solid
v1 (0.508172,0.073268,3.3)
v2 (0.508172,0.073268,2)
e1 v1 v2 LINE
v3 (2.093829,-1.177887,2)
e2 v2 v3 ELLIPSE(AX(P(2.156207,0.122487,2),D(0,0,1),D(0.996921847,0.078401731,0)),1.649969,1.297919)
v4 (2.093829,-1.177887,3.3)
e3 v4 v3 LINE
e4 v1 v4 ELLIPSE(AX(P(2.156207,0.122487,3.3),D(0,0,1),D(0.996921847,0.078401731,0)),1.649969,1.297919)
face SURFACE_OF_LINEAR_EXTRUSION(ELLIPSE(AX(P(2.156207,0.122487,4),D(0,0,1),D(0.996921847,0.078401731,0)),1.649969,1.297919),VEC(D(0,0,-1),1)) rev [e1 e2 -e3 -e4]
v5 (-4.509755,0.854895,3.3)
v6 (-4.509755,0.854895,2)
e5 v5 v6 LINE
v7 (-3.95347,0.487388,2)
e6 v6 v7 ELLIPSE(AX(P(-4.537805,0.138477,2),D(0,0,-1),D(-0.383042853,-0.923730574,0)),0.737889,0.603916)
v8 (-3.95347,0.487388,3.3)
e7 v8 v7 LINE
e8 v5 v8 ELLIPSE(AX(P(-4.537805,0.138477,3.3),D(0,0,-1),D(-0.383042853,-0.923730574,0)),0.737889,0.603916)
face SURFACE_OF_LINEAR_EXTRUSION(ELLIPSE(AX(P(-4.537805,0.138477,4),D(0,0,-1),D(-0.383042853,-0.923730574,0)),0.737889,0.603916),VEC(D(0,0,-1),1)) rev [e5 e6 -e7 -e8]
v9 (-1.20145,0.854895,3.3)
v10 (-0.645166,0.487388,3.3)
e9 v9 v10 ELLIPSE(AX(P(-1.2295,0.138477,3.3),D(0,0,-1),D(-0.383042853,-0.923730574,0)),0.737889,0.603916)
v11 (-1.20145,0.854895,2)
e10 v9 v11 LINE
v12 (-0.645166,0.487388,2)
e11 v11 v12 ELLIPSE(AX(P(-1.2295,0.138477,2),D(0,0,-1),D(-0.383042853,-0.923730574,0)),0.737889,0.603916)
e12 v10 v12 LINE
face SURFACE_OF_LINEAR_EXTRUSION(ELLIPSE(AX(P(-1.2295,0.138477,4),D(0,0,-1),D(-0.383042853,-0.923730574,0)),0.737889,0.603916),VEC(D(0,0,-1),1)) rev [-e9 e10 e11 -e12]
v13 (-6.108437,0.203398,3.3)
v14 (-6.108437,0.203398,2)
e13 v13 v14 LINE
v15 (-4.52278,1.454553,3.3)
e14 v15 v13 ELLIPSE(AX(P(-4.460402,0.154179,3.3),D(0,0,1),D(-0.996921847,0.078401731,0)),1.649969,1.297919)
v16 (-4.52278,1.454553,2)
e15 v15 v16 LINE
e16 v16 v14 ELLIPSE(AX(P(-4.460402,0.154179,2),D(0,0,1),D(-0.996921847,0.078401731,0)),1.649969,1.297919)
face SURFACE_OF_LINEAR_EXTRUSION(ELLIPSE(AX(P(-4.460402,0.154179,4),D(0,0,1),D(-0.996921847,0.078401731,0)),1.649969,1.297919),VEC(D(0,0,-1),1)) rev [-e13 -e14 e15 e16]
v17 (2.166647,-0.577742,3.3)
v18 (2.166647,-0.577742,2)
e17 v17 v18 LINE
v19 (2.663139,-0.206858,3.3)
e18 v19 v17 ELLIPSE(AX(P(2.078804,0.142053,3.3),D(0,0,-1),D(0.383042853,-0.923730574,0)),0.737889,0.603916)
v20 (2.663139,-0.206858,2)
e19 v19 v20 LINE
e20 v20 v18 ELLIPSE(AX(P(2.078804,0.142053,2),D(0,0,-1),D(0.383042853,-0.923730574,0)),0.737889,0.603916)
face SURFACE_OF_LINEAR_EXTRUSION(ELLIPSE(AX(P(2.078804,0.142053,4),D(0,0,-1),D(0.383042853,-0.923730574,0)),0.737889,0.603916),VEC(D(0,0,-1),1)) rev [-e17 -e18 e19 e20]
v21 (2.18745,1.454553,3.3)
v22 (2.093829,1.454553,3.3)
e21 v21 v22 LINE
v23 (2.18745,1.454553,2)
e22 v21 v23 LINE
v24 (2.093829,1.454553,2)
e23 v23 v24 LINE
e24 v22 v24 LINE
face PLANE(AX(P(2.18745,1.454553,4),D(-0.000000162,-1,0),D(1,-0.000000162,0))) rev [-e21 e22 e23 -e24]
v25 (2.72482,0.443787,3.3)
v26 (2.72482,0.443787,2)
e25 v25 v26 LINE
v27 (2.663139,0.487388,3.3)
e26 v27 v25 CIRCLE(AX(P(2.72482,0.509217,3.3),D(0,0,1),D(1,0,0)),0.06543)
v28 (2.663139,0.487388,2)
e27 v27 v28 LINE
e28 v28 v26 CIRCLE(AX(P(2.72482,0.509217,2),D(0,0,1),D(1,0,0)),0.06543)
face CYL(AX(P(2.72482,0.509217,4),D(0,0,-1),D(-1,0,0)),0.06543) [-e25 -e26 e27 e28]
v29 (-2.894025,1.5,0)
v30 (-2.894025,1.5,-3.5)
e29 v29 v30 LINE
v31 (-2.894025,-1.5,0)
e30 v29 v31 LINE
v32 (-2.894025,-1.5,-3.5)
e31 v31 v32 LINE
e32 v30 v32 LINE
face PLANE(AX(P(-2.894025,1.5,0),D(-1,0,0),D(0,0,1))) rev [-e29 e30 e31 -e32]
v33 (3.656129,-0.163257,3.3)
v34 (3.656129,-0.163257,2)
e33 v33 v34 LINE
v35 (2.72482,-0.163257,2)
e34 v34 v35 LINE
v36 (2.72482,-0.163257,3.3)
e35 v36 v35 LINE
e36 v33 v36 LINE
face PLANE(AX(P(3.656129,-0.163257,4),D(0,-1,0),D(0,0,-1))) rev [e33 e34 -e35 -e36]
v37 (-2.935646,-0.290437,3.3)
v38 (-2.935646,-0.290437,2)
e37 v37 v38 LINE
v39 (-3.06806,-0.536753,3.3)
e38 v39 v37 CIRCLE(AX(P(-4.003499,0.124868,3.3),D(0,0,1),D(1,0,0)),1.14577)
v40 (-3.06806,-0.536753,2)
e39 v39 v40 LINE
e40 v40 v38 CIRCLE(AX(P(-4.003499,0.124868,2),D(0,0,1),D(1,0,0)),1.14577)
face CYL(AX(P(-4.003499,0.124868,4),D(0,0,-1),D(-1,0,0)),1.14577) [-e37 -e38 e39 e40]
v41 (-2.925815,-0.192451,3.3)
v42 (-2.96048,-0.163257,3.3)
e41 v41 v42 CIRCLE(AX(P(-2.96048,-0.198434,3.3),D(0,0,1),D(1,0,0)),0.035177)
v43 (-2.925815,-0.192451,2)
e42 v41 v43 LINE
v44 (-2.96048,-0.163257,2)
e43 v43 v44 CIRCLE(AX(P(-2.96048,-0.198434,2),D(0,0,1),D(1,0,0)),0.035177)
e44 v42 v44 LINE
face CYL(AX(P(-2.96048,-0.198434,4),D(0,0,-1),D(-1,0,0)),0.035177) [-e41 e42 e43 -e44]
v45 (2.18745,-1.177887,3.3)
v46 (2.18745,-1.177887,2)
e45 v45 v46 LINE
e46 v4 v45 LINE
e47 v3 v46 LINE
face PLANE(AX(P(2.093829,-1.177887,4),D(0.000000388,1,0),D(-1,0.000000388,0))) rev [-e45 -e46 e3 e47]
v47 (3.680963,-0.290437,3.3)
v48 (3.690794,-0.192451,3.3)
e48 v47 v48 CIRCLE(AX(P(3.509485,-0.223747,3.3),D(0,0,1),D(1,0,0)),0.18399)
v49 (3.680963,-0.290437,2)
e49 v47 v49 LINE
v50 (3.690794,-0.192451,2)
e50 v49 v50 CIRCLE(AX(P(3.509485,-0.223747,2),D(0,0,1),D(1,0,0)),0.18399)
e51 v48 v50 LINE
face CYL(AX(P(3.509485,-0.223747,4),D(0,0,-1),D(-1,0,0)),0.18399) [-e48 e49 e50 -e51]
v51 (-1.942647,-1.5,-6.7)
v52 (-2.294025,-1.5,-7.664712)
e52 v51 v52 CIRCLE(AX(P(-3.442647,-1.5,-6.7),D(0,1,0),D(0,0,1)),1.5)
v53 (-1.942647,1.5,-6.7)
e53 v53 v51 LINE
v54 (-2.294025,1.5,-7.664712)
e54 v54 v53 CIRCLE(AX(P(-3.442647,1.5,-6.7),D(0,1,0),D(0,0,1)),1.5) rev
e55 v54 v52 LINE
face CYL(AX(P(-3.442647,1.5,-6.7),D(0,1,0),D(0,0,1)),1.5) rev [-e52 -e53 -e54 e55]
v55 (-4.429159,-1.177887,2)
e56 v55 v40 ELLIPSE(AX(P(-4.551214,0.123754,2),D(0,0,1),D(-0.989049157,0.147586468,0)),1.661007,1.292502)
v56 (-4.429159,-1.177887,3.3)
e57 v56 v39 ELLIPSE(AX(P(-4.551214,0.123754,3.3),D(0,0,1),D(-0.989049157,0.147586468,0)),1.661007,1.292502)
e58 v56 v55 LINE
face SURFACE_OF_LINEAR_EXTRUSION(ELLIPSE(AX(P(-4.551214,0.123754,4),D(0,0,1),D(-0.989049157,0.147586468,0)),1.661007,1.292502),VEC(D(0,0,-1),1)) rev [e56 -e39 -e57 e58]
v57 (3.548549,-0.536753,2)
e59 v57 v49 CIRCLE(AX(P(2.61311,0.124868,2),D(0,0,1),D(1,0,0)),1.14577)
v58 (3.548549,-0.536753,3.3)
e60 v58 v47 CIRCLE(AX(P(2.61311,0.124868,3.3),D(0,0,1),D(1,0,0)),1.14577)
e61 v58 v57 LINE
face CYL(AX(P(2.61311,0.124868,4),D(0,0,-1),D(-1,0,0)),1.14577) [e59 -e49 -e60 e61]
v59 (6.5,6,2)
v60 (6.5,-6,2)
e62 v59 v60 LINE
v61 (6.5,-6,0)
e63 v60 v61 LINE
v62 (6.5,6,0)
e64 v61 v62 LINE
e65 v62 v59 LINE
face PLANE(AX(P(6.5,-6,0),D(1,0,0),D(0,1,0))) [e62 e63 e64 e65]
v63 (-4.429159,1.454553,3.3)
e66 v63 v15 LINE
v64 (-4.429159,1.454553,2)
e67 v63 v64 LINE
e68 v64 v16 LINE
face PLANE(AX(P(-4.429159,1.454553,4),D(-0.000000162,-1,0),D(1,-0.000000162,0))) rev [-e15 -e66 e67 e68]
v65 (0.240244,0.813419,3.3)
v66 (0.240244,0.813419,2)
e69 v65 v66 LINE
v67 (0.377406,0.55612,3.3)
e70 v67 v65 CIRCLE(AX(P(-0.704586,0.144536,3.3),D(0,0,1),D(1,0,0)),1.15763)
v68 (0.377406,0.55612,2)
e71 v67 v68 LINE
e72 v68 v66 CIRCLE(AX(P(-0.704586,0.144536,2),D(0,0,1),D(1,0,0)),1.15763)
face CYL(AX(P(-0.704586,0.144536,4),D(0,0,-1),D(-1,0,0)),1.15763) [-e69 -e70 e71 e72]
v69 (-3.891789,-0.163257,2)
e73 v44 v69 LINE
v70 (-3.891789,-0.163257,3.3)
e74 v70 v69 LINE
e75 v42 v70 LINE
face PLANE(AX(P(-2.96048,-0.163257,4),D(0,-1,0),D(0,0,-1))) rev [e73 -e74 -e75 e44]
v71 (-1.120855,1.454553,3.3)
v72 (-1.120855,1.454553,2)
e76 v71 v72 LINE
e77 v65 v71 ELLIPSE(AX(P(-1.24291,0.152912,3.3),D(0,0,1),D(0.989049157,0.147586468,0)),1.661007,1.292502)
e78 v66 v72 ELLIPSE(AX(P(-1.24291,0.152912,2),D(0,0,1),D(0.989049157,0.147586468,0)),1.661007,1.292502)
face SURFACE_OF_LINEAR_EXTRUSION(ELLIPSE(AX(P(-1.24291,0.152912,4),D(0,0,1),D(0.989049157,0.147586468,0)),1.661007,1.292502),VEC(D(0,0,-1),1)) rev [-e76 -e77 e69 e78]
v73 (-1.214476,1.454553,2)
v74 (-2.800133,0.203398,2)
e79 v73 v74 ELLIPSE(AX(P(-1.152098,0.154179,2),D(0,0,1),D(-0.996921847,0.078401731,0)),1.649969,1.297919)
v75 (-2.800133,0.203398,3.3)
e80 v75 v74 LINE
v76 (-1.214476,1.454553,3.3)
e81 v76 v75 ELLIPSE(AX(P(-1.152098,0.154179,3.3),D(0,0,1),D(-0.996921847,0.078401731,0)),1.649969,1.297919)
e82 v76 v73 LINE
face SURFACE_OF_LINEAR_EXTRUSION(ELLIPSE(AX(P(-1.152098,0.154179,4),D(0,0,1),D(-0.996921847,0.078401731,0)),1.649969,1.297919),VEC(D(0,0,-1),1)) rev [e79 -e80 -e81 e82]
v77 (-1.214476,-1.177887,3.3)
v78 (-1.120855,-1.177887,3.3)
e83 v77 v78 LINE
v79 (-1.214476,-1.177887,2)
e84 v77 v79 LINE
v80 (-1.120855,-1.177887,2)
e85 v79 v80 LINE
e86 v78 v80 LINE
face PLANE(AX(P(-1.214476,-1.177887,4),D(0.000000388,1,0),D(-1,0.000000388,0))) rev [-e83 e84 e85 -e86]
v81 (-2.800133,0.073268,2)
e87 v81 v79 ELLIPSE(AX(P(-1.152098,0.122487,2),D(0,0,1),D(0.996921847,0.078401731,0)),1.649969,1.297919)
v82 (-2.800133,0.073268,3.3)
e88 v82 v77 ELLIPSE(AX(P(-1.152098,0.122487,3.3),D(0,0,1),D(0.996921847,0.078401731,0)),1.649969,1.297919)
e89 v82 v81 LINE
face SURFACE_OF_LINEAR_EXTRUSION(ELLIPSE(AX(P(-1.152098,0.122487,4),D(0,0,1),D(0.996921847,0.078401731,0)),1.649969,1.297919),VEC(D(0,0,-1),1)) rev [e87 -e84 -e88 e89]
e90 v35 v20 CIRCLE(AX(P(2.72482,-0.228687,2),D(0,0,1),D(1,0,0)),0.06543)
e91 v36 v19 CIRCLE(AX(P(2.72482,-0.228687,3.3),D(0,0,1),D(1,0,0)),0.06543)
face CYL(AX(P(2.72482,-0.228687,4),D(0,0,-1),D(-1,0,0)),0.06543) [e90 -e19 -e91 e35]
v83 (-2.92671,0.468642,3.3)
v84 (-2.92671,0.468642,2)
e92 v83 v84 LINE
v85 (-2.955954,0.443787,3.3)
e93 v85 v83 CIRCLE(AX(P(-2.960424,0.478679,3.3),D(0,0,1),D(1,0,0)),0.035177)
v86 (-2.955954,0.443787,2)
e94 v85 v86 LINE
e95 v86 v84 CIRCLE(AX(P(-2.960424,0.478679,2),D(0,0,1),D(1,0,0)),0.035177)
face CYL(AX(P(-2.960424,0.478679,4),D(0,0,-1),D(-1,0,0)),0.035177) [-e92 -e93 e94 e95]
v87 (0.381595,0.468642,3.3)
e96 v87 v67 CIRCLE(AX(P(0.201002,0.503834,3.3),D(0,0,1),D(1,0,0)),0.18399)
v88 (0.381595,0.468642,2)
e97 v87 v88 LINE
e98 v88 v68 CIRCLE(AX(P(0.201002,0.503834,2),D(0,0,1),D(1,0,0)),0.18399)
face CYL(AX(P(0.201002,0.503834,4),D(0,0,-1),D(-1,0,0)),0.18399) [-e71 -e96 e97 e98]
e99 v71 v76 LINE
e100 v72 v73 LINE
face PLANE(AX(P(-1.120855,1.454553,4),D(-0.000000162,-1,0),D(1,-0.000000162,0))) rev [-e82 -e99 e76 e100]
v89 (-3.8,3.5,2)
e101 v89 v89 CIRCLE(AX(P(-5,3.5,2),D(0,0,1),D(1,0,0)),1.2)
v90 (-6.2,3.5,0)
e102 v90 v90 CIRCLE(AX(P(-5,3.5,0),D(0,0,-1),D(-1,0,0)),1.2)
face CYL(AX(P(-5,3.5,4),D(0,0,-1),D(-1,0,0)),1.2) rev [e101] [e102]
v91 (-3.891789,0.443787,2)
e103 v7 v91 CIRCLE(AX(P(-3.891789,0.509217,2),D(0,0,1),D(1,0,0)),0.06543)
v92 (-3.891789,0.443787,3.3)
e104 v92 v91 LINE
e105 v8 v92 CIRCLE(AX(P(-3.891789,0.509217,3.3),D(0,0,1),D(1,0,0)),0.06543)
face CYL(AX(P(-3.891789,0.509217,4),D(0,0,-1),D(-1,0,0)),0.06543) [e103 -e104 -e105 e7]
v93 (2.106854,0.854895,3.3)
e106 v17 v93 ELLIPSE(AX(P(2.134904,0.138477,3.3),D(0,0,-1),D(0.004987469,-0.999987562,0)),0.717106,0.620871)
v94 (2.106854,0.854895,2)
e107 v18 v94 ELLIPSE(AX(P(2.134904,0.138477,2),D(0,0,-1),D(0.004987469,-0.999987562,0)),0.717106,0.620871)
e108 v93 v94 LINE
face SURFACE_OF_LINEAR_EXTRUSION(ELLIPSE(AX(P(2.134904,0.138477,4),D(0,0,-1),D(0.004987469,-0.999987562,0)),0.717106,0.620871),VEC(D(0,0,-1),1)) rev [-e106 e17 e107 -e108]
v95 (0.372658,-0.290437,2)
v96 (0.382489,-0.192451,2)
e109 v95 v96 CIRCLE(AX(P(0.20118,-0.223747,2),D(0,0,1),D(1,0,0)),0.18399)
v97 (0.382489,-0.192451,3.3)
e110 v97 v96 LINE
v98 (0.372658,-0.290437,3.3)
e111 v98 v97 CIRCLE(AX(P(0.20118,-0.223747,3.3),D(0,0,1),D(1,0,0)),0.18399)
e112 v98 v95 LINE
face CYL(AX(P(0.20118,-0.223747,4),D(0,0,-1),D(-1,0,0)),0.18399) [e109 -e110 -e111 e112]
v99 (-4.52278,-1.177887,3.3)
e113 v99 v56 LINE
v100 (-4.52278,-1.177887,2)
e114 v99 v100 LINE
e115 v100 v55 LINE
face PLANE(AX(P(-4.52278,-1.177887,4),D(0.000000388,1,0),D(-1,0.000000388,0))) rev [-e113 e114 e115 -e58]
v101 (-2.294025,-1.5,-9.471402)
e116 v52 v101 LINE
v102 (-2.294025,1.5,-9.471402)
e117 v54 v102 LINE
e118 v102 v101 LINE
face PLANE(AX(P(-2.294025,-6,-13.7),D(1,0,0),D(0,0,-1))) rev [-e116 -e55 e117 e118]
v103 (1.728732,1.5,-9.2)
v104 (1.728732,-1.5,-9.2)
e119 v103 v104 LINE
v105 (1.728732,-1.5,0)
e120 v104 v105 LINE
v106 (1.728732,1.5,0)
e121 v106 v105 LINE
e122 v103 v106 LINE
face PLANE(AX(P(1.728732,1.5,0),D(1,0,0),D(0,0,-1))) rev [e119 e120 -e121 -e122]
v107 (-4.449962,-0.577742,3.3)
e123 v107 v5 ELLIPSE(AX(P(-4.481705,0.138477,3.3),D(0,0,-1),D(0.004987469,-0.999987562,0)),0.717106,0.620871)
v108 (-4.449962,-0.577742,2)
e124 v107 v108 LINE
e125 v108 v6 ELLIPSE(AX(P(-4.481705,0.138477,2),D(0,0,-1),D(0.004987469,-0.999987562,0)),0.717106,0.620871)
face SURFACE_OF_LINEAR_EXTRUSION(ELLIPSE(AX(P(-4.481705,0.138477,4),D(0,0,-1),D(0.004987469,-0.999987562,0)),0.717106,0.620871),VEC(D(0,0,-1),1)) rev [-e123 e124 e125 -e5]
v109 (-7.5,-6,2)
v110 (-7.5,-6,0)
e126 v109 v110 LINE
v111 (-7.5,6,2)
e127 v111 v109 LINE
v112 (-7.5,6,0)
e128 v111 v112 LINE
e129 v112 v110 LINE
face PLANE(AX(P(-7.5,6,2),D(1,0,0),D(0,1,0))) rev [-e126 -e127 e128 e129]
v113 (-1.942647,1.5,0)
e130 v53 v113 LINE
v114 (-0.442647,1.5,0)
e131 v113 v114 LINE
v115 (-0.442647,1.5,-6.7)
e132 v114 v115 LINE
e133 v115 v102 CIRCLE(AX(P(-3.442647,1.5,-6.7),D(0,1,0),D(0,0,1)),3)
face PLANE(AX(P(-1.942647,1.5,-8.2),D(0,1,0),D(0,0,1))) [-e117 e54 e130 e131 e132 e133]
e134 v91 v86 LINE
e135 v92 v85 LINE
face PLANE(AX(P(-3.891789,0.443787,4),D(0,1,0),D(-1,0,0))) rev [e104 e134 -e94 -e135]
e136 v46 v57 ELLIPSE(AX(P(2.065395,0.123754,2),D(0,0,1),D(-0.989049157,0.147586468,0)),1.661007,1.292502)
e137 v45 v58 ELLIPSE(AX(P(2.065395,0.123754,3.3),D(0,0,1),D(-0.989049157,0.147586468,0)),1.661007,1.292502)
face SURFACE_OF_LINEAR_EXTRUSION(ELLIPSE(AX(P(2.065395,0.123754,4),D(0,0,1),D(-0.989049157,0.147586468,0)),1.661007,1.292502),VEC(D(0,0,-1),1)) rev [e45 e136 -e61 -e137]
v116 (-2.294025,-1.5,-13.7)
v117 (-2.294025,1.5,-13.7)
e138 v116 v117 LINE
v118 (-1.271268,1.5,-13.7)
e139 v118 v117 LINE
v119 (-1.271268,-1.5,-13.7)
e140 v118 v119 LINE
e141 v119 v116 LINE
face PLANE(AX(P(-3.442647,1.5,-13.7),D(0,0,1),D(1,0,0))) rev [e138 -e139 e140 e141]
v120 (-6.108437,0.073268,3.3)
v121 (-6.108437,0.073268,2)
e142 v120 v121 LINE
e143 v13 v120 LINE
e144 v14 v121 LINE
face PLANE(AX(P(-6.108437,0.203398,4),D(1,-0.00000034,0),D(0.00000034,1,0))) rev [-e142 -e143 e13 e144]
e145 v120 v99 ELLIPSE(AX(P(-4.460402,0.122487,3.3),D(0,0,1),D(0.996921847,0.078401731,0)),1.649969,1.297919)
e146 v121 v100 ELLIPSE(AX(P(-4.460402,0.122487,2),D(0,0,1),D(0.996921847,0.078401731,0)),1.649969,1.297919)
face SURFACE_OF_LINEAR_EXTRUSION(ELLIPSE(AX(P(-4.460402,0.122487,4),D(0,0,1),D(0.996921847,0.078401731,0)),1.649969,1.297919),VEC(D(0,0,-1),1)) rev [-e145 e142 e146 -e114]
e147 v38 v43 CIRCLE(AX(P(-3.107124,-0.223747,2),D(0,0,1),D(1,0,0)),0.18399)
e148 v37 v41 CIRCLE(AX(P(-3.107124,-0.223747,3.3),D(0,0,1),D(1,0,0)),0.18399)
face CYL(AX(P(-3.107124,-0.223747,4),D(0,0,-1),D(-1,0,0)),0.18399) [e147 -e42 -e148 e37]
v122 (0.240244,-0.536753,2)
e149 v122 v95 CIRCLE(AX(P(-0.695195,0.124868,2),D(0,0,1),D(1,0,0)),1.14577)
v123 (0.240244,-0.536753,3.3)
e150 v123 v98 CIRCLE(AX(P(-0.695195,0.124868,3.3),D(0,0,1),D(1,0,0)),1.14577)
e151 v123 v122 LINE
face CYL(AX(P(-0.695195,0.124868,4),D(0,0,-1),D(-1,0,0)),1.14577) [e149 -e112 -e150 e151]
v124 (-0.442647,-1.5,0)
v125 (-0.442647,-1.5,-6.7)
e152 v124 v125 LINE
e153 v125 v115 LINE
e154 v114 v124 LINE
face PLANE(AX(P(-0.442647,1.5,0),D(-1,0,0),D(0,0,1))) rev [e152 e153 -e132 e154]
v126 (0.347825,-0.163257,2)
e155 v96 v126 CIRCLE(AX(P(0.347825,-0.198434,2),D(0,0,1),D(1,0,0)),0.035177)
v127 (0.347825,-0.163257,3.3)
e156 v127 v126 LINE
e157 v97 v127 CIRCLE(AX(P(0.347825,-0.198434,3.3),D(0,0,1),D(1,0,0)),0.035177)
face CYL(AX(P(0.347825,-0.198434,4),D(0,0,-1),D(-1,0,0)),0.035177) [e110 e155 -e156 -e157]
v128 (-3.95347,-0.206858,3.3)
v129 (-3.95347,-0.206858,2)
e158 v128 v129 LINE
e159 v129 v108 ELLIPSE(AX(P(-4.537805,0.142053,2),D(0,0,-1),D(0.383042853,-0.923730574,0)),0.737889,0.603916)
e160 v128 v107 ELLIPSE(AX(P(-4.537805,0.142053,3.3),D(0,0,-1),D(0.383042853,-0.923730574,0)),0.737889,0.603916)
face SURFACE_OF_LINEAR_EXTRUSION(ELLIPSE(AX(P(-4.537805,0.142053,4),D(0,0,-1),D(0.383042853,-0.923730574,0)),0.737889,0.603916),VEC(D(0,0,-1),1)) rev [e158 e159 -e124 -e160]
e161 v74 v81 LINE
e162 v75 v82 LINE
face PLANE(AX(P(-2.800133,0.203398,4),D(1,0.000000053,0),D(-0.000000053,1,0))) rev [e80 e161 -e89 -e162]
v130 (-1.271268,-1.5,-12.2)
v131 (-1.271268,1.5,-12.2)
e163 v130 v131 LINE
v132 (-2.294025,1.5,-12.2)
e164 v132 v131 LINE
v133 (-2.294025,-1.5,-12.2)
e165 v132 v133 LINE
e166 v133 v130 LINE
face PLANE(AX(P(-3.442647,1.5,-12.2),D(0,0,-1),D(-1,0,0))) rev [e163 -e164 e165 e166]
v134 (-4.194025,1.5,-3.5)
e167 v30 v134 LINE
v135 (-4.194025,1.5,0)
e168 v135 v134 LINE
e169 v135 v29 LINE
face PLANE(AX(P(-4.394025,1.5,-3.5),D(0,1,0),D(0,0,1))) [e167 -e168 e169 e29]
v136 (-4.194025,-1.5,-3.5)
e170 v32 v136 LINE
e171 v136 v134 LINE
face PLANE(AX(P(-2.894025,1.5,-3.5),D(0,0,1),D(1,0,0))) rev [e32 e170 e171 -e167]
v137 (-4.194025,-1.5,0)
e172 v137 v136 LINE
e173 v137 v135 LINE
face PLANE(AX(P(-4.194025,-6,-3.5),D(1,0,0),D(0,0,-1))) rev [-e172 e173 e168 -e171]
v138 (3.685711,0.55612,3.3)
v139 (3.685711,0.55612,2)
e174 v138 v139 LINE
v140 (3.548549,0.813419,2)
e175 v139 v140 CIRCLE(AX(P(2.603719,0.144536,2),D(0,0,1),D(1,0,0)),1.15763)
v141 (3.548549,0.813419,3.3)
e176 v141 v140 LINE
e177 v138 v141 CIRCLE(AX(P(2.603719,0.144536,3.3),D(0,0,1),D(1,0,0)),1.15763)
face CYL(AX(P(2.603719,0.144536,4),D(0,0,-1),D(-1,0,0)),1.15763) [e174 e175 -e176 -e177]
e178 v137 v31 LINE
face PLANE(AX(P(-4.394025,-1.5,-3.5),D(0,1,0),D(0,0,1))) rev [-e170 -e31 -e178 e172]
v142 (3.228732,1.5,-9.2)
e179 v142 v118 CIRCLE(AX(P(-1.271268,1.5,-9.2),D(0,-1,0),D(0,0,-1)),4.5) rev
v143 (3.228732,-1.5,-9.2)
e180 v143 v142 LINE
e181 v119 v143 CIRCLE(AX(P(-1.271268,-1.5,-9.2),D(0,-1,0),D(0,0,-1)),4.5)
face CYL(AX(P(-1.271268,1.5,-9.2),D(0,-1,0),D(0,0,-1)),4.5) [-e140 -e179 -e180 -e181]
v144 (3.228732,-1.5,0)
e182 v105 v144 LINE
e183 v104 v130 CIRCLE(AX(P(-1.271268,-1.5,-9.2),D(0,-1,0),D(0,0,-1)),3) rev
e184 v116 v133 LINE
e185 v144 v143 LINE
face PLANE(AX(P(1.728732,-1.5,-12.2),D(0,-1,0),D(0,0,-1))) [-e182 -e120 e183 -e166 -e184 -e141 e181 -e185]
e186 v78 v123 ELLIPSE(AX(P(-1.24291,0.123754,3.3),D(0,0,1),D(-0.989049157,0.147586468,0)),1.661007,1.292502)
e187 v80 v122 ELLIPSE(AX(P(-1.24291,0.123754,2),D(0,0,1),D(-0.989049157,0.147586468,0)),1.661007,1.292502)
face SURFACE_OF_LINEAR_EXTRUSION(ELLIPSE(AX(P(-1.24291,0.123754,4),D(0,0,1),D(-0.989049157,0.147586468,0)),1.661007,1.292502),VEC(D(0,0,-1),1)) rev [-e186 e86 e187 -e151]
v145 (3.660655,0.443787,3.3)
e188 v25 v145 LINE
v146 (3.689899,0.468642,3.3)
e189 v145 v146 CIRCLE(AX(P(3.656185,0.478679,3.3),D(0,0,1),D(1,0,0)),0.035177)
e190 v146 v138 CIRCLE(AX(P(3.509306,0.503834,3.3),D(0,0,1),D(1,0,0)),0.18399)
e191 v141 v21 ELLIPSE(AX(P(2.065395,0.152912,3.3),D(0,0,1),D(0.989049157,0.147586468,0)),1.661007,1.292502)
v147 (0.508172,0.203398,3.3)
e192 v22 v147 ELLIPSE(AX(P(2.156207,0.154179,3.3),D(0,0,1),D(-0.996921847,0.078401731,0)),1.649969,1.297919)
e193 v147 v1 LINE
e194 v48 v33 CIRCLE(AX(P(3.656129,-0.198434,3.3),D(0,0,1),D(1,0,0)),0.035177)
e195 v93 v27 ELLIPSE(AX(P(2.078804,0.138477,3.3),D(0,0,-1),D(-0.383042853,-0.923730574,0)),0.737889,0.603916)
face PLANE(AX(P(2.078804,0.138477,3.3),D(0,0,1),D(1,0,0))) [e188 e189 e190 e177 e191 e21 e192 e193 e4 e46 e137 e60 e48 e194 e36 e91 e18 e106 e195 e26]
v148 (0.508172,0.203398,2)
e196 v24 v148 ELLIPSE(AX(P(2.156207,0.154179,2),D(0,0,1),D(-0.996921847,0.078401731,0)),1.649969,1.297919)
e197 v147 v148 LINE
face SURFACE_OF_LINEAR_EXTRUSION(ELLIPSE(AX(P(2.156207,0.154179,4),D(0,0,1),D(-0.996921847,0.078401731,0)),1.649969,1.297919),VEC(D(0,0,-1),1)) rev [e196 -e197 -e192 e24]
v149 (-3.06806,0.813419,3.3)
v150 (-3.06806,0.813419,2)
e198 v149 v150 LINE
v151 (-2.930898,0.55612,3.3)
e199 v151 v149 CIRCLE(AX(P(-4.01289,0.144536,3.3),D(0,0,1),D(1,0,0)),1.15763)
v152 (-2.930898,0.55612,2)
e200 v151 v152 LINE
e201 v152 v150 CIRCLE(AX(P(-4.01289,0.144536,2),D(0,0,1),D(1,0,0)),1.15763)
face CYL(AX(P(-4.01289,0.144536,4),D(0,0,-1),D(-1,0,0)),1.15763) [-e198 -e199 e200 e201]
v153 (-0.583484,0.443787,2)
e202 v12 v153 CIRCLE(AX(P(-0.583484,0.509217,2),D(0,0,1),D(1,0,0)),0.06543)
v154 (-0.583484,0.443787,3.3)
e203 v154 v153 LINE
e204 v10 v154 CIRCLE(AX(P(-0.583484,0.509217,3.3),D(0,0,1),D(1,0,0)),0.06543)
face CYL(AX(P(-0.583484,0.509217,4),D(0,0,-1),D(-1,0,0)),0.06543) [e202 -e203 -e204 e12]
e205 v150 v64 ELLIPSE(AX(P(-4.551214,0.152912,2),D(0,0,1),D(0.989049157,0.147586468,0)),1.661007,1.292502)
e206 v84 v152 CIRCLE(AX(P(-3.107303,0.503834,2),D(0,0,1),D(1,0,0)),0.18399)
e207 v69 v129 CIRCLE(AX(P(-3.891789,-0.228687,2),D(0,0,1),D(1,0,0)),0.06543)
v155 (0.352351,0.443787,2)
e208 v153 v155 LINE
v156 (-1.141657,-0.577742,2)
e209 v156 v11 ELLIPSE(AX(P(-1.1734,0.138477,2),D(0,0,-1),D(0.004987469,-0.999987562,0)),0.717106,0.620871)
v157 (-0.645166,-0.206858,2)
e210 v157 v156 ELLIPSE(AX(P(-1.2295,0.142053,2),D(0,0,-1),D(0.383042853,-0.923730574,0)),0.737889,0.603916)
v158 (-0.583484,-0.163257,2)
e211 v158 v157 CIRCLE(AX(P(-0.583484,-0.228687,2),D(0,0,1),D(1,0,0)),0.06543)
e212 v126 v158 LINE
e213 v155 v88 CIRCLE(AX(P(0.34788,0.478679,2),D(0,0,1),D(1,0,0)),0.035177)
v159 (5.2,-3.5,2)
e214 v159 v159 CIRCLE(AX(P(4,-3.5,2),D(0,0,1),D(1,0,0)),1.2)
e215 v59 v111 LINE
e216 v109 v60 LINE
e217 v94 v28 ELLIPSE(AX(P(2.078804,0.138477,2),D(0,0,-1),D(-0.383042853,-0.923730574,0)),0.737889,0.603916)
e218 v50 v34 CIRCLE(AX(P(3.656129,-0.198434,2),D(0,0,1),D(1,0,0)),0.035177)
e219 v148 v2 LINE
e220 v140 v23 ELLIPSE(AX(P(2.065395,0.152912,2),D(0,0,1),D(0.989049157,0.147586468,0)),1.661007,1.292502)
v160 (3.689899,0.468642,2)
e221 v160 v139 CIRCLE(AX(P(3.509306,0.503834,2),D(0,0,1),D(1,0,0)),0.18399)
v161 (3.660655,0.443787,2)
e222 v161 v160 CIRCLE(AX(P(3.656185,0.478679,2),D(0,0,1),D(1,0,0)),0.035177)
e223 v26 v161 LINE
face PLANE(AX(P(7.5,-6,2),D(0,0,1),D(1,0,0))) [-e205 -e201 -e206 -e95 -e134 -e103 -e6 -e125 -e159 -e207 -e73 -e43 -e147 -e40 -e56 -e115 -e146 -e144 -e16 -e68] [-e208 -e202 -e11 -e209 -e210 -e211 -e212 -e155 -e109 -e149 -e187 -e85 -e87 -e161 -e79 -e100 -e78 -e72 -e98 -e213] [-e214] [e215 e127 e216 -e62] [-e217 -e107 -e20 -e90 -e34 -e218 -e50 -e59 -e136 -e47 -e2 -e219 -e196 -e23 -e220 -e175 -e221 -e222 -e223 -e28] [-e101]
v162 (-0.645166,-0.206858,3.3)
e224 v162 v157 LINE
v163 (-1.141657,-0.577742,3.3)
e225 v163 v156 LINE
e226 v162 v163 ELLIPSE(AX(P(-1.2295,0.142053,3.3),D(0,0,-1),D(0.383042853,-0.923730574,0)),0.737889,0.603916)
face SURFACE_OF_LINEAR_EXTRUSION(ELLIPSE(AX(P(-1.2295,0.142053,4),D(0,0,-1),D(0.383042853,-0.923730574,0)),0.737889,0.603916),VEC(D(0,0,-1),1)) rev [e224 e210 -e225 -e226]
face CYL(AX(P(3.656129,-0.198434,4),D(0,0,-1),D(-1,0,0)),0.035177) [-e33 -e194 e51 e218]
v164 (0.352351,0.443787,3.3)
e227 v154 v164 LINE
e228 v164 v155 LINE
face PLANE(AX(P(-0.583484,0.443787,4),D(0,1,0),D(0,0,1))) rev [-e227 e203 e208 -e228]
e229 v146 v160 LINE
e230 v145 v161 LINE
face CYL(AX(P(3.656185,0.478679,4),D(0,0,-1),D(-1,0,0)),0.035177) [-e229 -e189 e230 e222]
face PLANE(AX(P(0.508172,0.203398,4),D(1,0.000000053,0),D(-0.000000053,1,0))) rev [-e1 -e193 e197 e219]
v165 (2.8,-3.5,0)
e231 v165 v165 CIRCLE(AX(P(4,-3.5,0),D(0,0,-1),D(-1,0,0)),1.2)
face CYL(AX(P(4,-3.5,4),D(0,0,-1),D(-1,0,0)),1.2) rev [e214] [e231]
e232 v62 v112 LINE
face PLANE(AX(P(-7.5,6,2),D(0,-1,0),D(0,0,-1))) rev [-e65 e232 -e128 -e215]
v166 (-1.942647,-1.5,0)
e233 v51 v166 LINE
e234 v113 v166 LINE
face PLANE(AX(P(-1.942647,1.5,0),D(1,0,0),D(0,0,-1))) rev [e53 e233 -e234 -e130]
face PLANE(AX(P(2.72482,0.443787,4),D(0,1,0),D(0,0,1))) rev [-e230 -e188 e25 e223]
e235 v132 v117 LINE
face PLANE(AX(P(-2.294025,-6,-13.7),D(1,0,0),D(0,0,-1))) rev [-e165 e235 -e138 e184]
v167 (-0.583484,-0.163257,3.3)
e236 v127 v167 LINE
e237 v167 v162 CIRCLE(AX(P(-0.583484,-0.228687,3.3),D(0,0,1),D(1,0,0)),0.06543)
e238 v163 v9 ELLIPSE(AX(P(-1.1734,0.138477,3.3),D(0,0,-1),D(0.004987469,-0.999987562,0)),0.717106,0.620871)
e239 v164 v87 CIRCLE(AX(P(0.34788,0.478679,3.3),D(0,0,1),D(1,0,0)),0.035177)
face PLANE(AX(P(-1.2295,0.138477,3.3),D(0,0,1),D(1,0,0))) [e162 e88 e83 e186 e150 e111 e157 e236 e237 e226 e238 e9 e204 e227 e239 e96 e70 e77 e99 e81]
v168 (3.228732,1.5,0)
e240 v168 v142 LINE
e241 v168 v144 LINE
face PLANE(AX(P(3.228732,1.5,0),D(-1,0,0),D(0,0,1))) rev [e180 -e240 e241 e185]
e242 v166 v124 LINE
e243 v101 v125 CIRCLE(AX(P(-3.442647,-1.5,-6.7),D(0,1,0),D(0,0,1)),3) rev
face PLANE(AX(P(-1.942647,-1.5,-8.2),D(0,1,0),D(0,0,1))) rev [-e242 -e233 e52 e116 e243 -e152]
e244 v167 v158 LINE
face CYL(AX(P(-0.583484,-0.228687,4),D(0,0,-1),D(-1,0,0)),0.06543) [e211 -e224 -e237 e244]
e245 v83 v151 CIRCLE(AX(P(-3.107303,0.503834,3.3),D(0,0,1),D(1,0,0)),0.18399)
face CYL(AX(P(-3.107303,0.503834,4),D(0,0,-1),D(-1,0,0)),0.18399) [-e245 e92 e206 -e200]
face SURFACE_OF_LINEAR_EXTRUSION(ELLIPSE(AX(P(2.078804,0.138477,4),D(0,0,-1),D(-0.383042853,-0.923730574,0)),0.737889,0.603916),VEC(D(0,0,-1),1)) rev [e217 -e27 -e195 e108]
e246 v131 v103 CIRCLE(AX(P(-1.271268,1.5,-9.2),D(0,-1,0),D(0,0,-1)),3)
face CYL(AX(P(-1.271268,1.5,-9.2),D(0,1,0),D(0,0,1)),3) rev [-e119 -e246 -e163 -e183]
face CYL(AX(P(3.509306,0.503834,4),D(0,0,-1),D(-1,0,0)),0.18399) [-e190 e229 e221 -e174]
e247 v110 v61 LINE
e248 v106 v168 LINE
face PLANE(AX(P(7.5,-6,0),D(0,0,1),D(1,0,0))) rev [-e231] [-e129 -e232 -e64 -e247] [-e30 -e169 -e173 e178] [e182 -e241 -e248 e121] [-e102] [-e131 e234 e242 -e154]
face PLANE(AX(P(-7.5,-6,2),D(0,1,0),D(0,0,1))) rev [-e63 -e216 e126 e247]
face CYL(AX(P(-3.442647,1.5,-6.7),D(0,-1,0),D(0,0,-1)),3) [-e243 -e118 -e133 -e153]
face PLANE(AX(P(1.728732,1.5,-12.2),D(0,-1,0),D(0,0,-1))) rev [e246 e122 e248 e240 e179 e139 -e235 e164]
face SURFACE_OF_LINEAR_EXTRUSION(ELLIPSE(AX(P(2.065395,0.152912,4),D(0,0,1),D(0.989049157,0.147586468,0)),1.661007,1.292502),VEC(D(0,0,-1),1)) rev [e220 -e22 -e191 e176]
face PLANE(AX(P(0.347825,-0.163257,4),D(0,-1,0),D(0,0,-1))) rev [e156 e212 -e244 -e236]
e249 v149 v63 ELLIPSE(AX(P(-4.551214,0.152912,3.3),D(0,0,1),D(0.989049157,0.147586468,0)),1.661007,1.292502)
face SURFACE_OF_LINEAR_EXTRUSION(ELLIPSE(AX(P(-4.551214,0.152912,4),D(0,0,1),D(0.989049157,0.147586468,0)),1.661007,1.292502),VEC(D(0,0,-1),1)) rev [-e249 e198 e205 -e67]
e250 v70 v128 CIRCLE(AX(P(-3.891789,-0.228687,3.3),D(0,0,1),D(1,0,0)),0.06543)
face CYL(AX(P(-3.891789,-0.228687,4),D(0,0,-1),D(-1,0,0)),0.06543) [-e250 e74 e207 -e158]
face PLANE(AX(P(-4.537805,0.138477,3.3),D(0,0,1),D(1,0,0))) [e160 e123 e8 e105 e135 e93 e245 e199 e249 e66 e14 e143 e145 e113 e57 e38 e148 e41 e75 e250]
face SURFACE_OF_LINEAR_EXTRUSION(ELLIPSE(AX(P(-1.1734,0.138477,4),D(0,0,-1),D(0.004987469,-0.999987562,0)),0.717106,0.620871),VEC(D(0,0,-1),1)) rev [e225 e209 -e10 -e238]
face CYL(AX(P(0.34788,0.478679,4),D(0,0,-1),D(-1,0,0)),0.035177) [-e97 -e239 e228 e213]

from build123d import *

# Parameters (mm, degrees)
SKETCH1_W           = 15
SKETCH1_H           = 12
BOSS_EXTRUDE1_DEPTH = 2
BOSS_EXTRUDE2_DEPTH = 2
SKETCH3_W           = 1.5
SKETCH3_H           = 3.5
BOSS_EXTRUDE3_DEPTH = 1.5
FILLET3_R           = 1.5
FILLET4_R           = 3
FILLET5_R           = 3
FILLET6_R           = 4.5
SKETCH4_W           = 2
SKETCH4_H           = 12
CUT_EXTRUDE1_DEPTH  = 1
SKETCH5_R           = 1.2
CUT_EXTRUDE2_DEPTH  = 17.731407672
CUT_EXTRUDE3_START  = -0.7
CUT_EXTRUDE3_DEPTH  = 0.7
SKETCH7_W           = 1.148621372
SKETCH7_H           = 6.2
CUT_EXTRUDE4_DEPTH  = 18.325992122
SKETCH8_W           = 0.2
SKETCH8_H           = 3.5
CUT_EXTRUDE5_DEPTH  = 18.325992122


with BuildPart() as part:
    # Sketch1 → Boss-Extrude1 (new body)
    with BuildSketch(Plane.XY):
        Rectangle(SKETCH1_W, SKETCH1_H)
    extrude(amount=BOSS_EXTRUDE1_DEPTH)

    # Sketch2 → Boss-Extrude2 (add)
    with BuildSketch(Plane.XY.offset(2)):
        with BuildLine():
            Line((-0.583484164, 0.443787032), (0.352350759, 0.443787032))
            ThreePointArc((0.352350759, 0.443787032), (0.370660979, 0.451874829), (0.381594807, 0.468641703))
            ThreePointArc((0.381594807, 0.468641703), (0.38478126, 0.512633483), (0.377406248, 0.556119567))
            ThreePointArc((0.377406248, 0.556119567), (0.316958398, 0.689104808), (0.240244136, 0.81341868))
            add(Edge.make_bspline(
                [(0.240244136, 0.81341868), (-0.178053426, 1.454553053), (-1.120854898, 1.454553053)],
                knots=[3.484341046, 3.484341046, 3.484341046, 4.522924348, 4.522924348, 4.522924348], degree=2, weights=[1, 0.868170926, 1]))
            Line((-1.120854898, 1.454553053), (-1.214475951, 1.454553068))
            add(Edge.make_bspline(
                [(-1.214475951, 1.454553068), (-2.800132813, 1.454553068), (-2.800132813, 0.203397992)],
                knots=[1.670440536, 1.670440536, 1.670440536, 3.203377674, 3.203377674, 3.203377674], degree=2, weights=[1, 0.720364542, 1]))
            Line((-2.800132813, 0.203397992), (-2.800132806, 0.073267738))
            add(Edge.make_bspline(
                [(-2.800132806, 0.073267738), (-2.800132806, -1.177887338), (-1.214475944, -1.177887338)],
                knots=[3.079807634, 3.079807634, 3.079807634, 4.612744771, 4.612744771, 4.612744771], degree=2, weights=[1, 0.720364542, 1]))
            Line((-1.214475944, -1.177887338), (-1.120854891, -1.177887375))
            add(Edge.make_bspline(
                [(-1.120854891, -1.177887375), (-0.178053419, -1.177887375), (0.240244143, -0.536753002)],
                knots=[1.760260959, 1.760260959, 1.760260959, 2.798844261, 2.798844261, 2.798844261], degree=2, weights=[1, 0.868170926, 1]))
            ThreePointArc((0.240244143, -0.536753002), (0.313994237, -0.417650167), (0.372658208, -0.290437354))
            ThreePointArc((0.372658208, -0.290437354), (0.384251196, -0.24211404), (0.382489087, -0.192450825))
            ThreePointArc((0.382489087, -0.192450825), (0.370484527, -0.171527836), (0.347824512, -0.163257123))
            Line((0.347824512, -0.163257123), (-0.58348421, -0.163257123))
            ThreePointArc((-0.58348421, -0.163257123), (-0.62125204, -0.175257922), (-0.645165579, -0.206858093))
            add(Edge.make_bspline(
                [(-1.141657158, -0.577741646), (-0.776549247, -0.578100851), (-0.645165579, -0.206858093)],
                knots=[5.955155363, 5.955155363, 5.955155363, 7.020735545, 7.020735545, 7.020735545], degree=2, weights=[1, 0.86139323, 1]))
            add(Edge.make_bspline(
                [(-1.201450314, 0.854894524), (-1.823540048, 0.823436889), (-1.793554178, 0.104979402), (-1.763568309, -0.613478086), (-1.141657158, -0.577741646)],
                knots=[0.039432941, 0.039432941, 0.039432941, 1.613207044, 1.613207044, 3.186981147, 3.186981147, 3.186981147], degree=2, weights=[1, 0.706053195, 1, 0.706053195, 1]))
            add(Edge.make_bspline(
                [(-0.645165584, 0.487388037), (-0.79140441, 0.900606071), (-1.201450314, 0.854894524)],
                knots=[2.404042441, 2.404042441, 2.404042441, 3.565685694, 3.565685694, 3.565685694], degree=2, weights=[1, 0.836012096, 1]))
            ThreePointArc((-0.645165584, 0.487388037), (-0.621252025, 0.455787841), (-0.583484164, 0.443787032))
        make_face()
        with BuildLine():
            Line((-3.89178871, 0.443787032), (-2.955953786, 0.443787032))
            ThreePointArc((-2.955953786, 0.443787032), (-2.937643536, 0.451874816), (-2.926709688, 0.468641703))
            ThreePointArc((-2.926709688, 0.468641703), (-2.923523234, 0.512633483), (-2.930898247, 0.556119567))
            ThreePointArc((-2.930898247, 0.556119567), (-2.991346096, 0.689104808), (-3.068060358, 0.81341868))
            add(Edge.make_bspline(
                [(-3.068060358, 0.81341868), (-3.48635792, 1.454553053), (-4.429159392, 1.454553053)],
                knots=[3.484341046, 3.484341046, 3.484341046, 4.522924348, 4.522924348, 4.522924348], degree=2, weights=[1, 0.868170926, 1]))
            Line((-4.429159392, 1.454553053), (-4.522780446, 1.454553068))
            add(Edge.make_bspline(
                [(-4.522780446, 1.454553068), (-6.108437307, 1.454553068), (-6.108437307, 0.203397992)],
                knots=[4.81203319, 4.81203319, 4.81203319, 6.344970327, 6.344970327, 6.344970327], degree=2, weights=[1, 0.720364542, 1]))
            Line((-6.108437307, 0.203397992), (-6.108437352, 0.073267738))
            add(Edge.make_bspline(
                [(-6.108437352, 0.073267738), (-6.108437352, -1.177887338), (-4.52278049, -1.177887338)],
                knots=[6.221400287, 6.221400287, 6.221400287, 7.754337425, 7.754337425, 7.754337425], degree=2, weights=[1, 0.720364542, 1]))
            Line((-4.52278049, -1.177887338), (-4.429159437, -1.177887375))
            add(Edge.make_bspline(
                [(-4.429159437, -1.177887375), (-3.486357965, -1.177887375), (-3.068060402, -0.536753002)],
                knots=[1.760260959, 1.760260959, 1.760260959, 2.798844261, 2.798844261, 2.798844261], degree=2, weights=[1, 0.868170926, 1]))
            ThreePointArc((-3.068060402, -0.536753002), (-2.994310308, -0.417650167), (-2.935646337, -0.290437354))
            ThreePointArc((-2.935646337, -0.290437354), (-2.92405335, -0.24211404), (-2.925815458, -0.192450825))
            ThreePointArc((-2.925815458, -0.192450825), (-2.937820019, -0.171527836), (-2.960480033, -0.163257123))
            Line((-2.960480033, -0.163257123), (-3.891788755, -0.163257123))
            ThreePointArc((-3.891788755, -0.163257123), (-3.929556585, -0.175257922), (-3.953470124, -0.206858093))
            add(Edge.make_bspline(
                [(-4.449961703, -0.577741646), (-4.084853792, -0.578100851), (-3.953470124, -0.206858093)],
                knots=[5.955155363, 5.955155363, 5.955155363, 7.020735545, 7.020735545, 7.020735545], degree=2, weights=[1, 0.86139323, 1]))
            add(Edge.make_bspline(
                [(-4.509754859, 0.854894524), (-5.131844593, 0.82343689), (-5.101858724, 0.104979402), (-5.071872854, -0.613478086), (-4.449961703, -0.577741646)],
                knots=[0.039432941, 0.039432941, 0.039432941, 1.613207044, 1.613207044, 3.186981147, 3.186981147, 3.186981147], degree=2, weights=[1, 0.706053195, 1, 0.706053195, 1]))
            add(Edge.make_bspline(
                [(-3.95347013, 0.487388037), (-4.099708956, 0.900606071), (-4.509754859, 0.854894524)],
                knots=[2.40404244, 2.40404244, 2.40404244, 3.565685694, 3.565685694, 3.565685694], degree=2, weights=[1, 0.836012096, 1]))
            ThreePointArc((-3.95347013, 0.487388037), (-3.92955657, 0.455787841), (-3.89178871, 0.443787032))
        make_face()
        with BuildLine():
            Line((2.724820382, 0.443787032), (3.660655305, 0.443787032))
            ThreePointArc((3.660655305, 0.443787032), (3.678965525, 0.451874829), (3.689899353, 0.468641703))
            ThreePointArc((3.689899353, 0.468641703), (3.693085806, 0.512633483), (3.685710794, 0.556119567))
            ThreePointArc((3.685710794, 0.556119567), (3.625262944, 0.689104808), (3.548548682, 0.81341868))
            add(Edge.make_bspline(
                [(3.548548682, 0.81341868), (3.13025112, 1.454553053), (2.187449648, 1.454553053)],
                knots=[0.342748392, 0.342748392, 0.342748392, 1.381331695, 1.381331695, 1.381331695], degree=2, weights=[1, 0.868170926, 1]))
            Line((2.187449648, 1.454553053), (2.093828595, 1.454553068))
            add(Edge.make_bspline(
                [(2.093828595, 1.454553068), (0.508171733, 1.454553068), (0.508171733, 0.203397992)],
                knots=[4.81203319, 4.81203319, 4.81203319, 6.344970327, 6.344970327, 6.344970327], degree=2, weights=[1, 0.720364542, 1]))
            Line((0.508171733, 0.203397992), (0.50817174, 0.073267738))
            add(Edge.make_bspline(
                [(0.50817174, 0.073267738), (0.50817174, -1.177887338), (2.093828602, -1.177887338)],
                knots=[3.079807634, 3.079807634, 3.079807634, 4.612744771, 4.612744771, 4.612744771], degree=2, weights=[1, 0.720364542, 1]))
            Line((2.093828602, -1.177887338), (2.187449655, -1.177887375))
            add(Edge.make_bspline(
                [(2.187449655, -1.177887375), (3.130251127, -1.177887375), (3.548548689, -0.536753002)],
                knots=[1.760260959, 1.760260959, 1.760260959, 2.798844261, 2.798844261, 2.798844261], degree=2, weights=[1, 0.868170926, 1]))
            ThreePointArc((3.548548689, -0.536753002), (3.622298783, -0.417650167), (3.680962754, -0.290437354))
            ThreePointArc((3.680962754, -0.290437354), (3.692555742, -0.24211404), (3.690793633, -0.192450825))
            ThreePointArc((3.690793633, -0.192450825), (3.678789073, -0.171527836), (3.656129058, -0.163257123))
            Line((3.656129058, -0.163257123), (2.724820336, -0.163257123))
            ThreePointArc((2.724820336, -0.163257123), (2.687052506, -0.175257922), (2.663138967, -0.206858093))
            add(Edge.make_bspline(
                [(2.166647388, -0.577741646), (2.531755299, -0.578100851), (2.663138967, -0.206858093)],
                knots=[5.955155363, 5.955155363, 5.955155363, 7.020735545, 7.020735545, 7.020735545], degree=2, weights=[1, 0.86139323, 1]))
            add(Edge.make_bspline(
                [(2.106854232, 0.854894524), (1.484764498, 0.823436889), (1.514750368, 0.104979402), (1.544736237, -0.613478086), (2.166647388, -0.577741646)],
                knots=[3.181025595, 3.181025595, 3.181025595, 4.754799698, 4.754799698, 6.328573801, 6.328573801, 6.328573801], degree=2, weights=[1, 0.706053195, 1, 0.706053195, 1]))
            add(Edge.make_bspline(
                [(2.663138962, 0.487388037), (2.516900136, 0.900606071), (2.106854232, 0.854894524)],
                knots=[5.545635094, 5.545635094, 5.545635094, 6.707278348, 6.707278348, 6.707278348], degree=2, weights=[1, 0.836012096, 1]))
            ThreePointArc((2.663138962, 0.487388037), (2.687052521, 0.455787841), (2.724820382, 0.443787032))
        make_face()
    extrude(amount=BOSS_EXTRUDE2_DEPTH)

    # Sketch3 → Boss-Extrude3 (add, symmetric)
    with BuildSketch(Plane(origin=(0, 0, 0), x_dir=(1, 0, 0), z_dir=(0, 1, 0))):
        Polygon((1.72873188, 0), (3.22873188, 0), (3.22873188, 13.7), (-3.442646753, 13.7), (-3.442646753, 12.2), (1.72873188, 12.2), align=None)
        with Locations((-3.644025381, 1.75)):
            Rectangle(SKETCH3_W, SKETCH3_H)
        Polygon((-1.942646753, 0), (-0.442646753, 0), (-0.442646753, 9.7), (-3.442646753, 9.7), (-3.442646753, 8.2), (-1.942646753, 8.2), align=None)
    extrude(amount=BOSS_EXTRUDE3_DEPTH, both=True)

    # Fillet3
    fillet3_edges = [part.edges().sort_by_distance(p)[0] for p in [
        (-1.942646753, 0, -8.2),
    ]]
    fillet(fillet3_edges, radius=FILLET3_R - 0.0001)  # a hair under: the kernel refuses the full size

    # Fillet4
    fillet4_edges = [part.edges().sort_by_distance(p)[0] for p in [
        (-0.442646753, 0, -9.7),
    ]]
    fillet(fillet4_edges, radius=FILLET4_R - 0.0001)  # a hair under: the kernel refuses the full size

    # Fillet5
    fillet5_edges = [part.edges().sort_by_distance(p)[0] for p in [
        (1.72873188, 0, -12.2),
    ]]
    fillet(fillet5_edges, radius=FILLET5_R)

    # Fillet6
    fillet6_edges = [part.edges().sort_by_distance(p)[0] for p in [
        (3.22873188, 0, -13.7),
    ]]
    fillet(fillet6_edges, radius=FILLET6_R)

    # Sketch4 → Cut-Extrude1 (cut)
    with BuildSketch(Plane(origin=(7.5, 0, 0), x_dir=(0, 0, -1), z_dir=(1, 0, 0))):
        with Locations((-1, 0)):
            Rectangle(SKETCH4_W, SKETCH4_H)
    extrude(amount=-CUT_EXTRUDE1_DEPTH, mode=Mode.SUBTRACT)

    # Sketch5 → Cut-Extrude2 (cut, through all)
    with BuildSketch(Plane(origin=(0, 0, 0), x_dir=(-1, 0, 0), z_dir=(0, 0, -1))):
        with Locations((-4, -3.5)):
            Circle(SKETCH5_R)
        with Locations((5, 3.5)):
            Circle(SKETCH5_R)
    extrude(amount=-CUT_EXTRUDE2_DEPTH, mode=Mode.SUBTRACT)

    # Sketch6 → Cut-Extrude3 (cut)
    with BuildSketch(Plane.XY.offset(4).offset(CUT_EXTRUDE3_START)):
        with BuildLine():
            Line((2.724820382, 0.443787032), (3.660655305, 0.443787032))
            ThreePointArc((3.660655305, 0.443787032), (3.678965525, 0.451874829), (3.689899353, 0.468641703))
            ThreePointArc((3.689899353, 0.468641703), (3.693085806, 0.512633483), (3.685710794, 0.556119567))
            ThreePointArc((3.685710794, 0.556119567), (3.625262944, 0.689104808), (3.548548682, 0.81341868))
            add(Edge.make_bspline(
                [(3.548548682, 0.81341868), (3.13025112, 1.454553053), (2.187449648, 1.454553053)],
                knots=[0.342748392, 0.342748392, 0.342748392, 1.381331695, 1.381331695, 1.381331695], degree=2, weights=[1, 0.868170926, 1]))
            Line((2.187449648, 1.454553053), (2.093828595, 1.454553068))
            add(Edge.make_bspline(
                [(2.093828595, 1.454553068), (0.508171733, 1.454553068), (0.508171733, 0.203397992)],
                knots=[4.81203319, 4.81203319, 4.81203319, 6.344970327, 6.344970327, 6.344970327], degree=2, weights=[1, 0.720364542, 1]))
            Line((0.508171733, 0.203397992), (0.50817174, 0.073267738))
            add(Edge.make_bspline(
                [(0.50817174, 0.073267738), (0.50817174, -1.177887338), (2.093828602, -1.177887338)],
                knots=[3.079807634, 3.079807634, 3.079807634, 4.612744771, 4.612744771, 4.612744771], degree=2, weights=[1, 0.720364542, 1]))
            Line((2.093828602, -1.177887338), (2.187449655, -1.177887375))
            add(Edge.make_bspline(
                [(2.187449655, -1.177887375), (3.130251127, -1.177887375), (3.548548689, -0.536753002)],
                knots=[1.760260959, 1.760260959, 1.760260959, 2.798844261, 2.798844261, 2.798844261], degree=2, weights=[1, 0.868170926, 1]))
            ThreePointArc((3.548548689, -0.536753002), (3.622298783, -0.417650167), (3.680962754, -0.290437354))
            ThreePointArc((3.680962754, -0.290437354), (3.692555742, -0.24211404), (3.690793633, -0.192450825))
            ThreePointArc((3.690793633, -0.192450825), (3.678789073, -0.171527836), (3.656129058, -0.163257123))
            Line((3.656129058, -0.163257123), (2.724820336, -0.163257123))
            ThreePointArc((2.724820336, -0.163257123), (2.687052506, -0.175257922), (2.663138967, -0.206858093))
            add(Edge.make_bspline(
                [(2.166647388, -0.577741646), (2.531755299, -0.578100851), (2.663138967, -0.206858093)],
                knots=[5.955155363, 5.955155363, 5.955155363, 7.020735545, 7.020735545, 7.020735545], degree=2, weights=[1, 0.86139323, 1]))
            add(Edge.make_bspline(
                [(2.106854232, 0.854894524), (1.484764498, 0.823436889), (1.514750368, 0.104979402), (1.544736237, -0.613478086), (2.166647388, -0.577741646)],
                knots=[3.181025595, 3.181025595, 3.181025595, 4.754799698, 4.754799698, 6.328573801, 6.328573801, 6.328573801], degree=2, weights=[1, 0.706053195, 1, 0.706053195, 1]))
            add(Edge.make_bspline(
                [(2.663138962, 0.487388037), (2.516900136, 0.900606071), (2.106854232, 0.854894524)],
                knots=[2.404042441, 2.404042441, 2.404042441, 3.565685694, 3.565685694, 3.565685694], degree=2, weights=[1, 0.836012096, 1]))
            ThreePointArc((2.663138962, 0.487388037), (2.687052521, 0.455787841), (2.724820382, 0.443787032))
        make_face()
        with BuildLine():
            Line((-0.583484164, 0.443787032), (0.352350759, 0.443787032))
            ThreePointArc((0.352350759, 0.443787032), (0.370660979, 0.451874829), (0.381594807, 0.468641703))
            ThreePointArc((0.381594807, 0.468641703), (0.38478126, 0.512633483), (0.377406248, 0.556119567))
            ThreePointArc((0.377406248, 0.556119567), (0.316958398, 0.689104808), (0.240244136, 0.81341868))
            add(Edge.make_bspline(
                [(0.240244136, 0.81341868), (-0.178053426, 1.454553053), (-1.120854898, 1.454553053)],
                knots=[0.342748392, 0.342748392, 0.342748392, 1.381331695, 1.381331695, 1.381331695], degree=2, weights=[1, 0.868170926, 1]))
            Line((-1.120854898, 1.454553053), (-1.214475951, 1.454553068))
            add(Edge.make_bspline(
                [(-1.214475951, 1.454553068), (-2.800132813, 1.454553068), (-2.800132813, 0.203397992)],
                knots=[4.81203319, 4.81203319, 4.81203319, 6.344970327, 6.344970327, 6.344970327], degree=2, weights=[1, 0.720364542, 1]))
            Line((-2.800132813, 0.203397992), (-2.800132806, 0.073267738))
            add(Edge.make_bspline(
                [(-2.800132806, 0.073267738), (-2.800132806, -1.177887338), (-1.214475944, -1.177887338)],
                knots=[3.079807634, 3.079807634, 3.079807634, 4.612744771, 4.612744771, 4.612744771], degree=2, weights=[1, 0.720364542, 1]))
            Line((-1.214475944, -1.177887338), (-1.120854891, -1.177887375))
            add(Edge.make_bspline(
                [(-1.120854891, -1.177887375), (-0.178053419, -1.177887375), (0.240244143, -0.536753002)],
                knots=[1.760260959, 1.760260959, 1.760260959, 2.798844261, 2.798844261, 2.798844261], degree=2, weights=[1, 0.868170926, 1]))
            ThreePointArc((0.240244143, -0.536753002), (0.313994237, -0.417650167), (0.372658208, -0.290437354))
            ThreePointArc((0.372658208, -0.290437354), (0.384251196, -0.24211404), (0.382489087, -0.192450825))
            ThreePointArc((0.382489087, -0.192450825), (0.370484527, -0.171527836), (0.347824512, -0.163257123))
            Line((0.347824512, -0.163257123), (-0.58348421, -0.163257123))
            ThreePointArc((-0.58348421, -0.163257123), (-0.62125204, -0.175257922), (-0.645165579, -0.206858093))
            add(Edge.make_bspline(
                [(-1.141657158, -0.577741646), (-0.776549247, -0.578100851), (-0.645165579, -0.206858093)],
                knots=[5.955155363, 5.955155363, 5.955155363, 7.020735545, 7.020735545, 7.020735545], degree=2, weights=[1, 0.86139323, 1]))
            add(Edge.make_bspline(
                [(-1.201450314, 0.854894524), (-1.823540048, 0.823436889), (-1.793554178, 0.104979402), (-1.763568309, -0.613478086), (-1.141657158, -0.577741646)],
                knots=[3.181025595, 3.181025595, 3.181025595, 4.754799698, 4.754799698, 6.328573801, 6.328573801, 6.328573801], degree=2, weights=[1, 0.706053195, 1, 0.706053195, 1]))
            add(Edge.make_bspline(
                [(-0.645165584, 0.487388037), (-0.79140441, 0.900606071), (-1.201450314, 0.854894524)],
                knots=[2.404042441, 2.404042441, 2.404042441, 3.565685694, 3.565685694, 3.565685694], degree=2, weights=[1, 0.836012096, 1]))
            ThreePointArc((-0.645165584, 0.487388037), (-0.621252025, 0.455787841), (-0.583484164, 0.443787032))
        make_face()
        with BuildLine():
            Line((-3.89178871, 0.443787032), (-2.955953786, 0.443787032))
            ThreePointArc((-2.955953786, 0.443787032), (-2.937643536, 0.451874816), (-2.926709688, 0.468641703))
            ThreePointArc((-2.926709688, 0.468641703), (-2.923523234, 0.512633483), (-2.930898247, 0.556119567))
            ThreePointArc((-2.930898247, 0.556119567), (-2.991346096, 0.689104808), (-3.068060358, 0.81341868))
            add(Edge.make_bspline(
                [(-3.068060358, 0.81341868), (-3.48635792, 1.454553053), (-4.429159392, 1.454553053)],
                knots=[0.342748392, 0.342748392, 0.342748392, 1.381331695, 1.381331695, 1.381331695], degree=2, weights=[1, 0.868170926, 1]))
            Line((-4.429159392, 1.454553053), (-4.522780446, 1.454553068))
            add(Edge.make_bspline(
                [(-4.522780446, 1.454553068), (-6.108437307, 1.454553068), (-6.108437307, 0.203397992)],
                knots=[4.81203319, 4.81203319, 4.81203319, 6.344970327, 6.344970327, 6.344970327], degree=2, weights=[1, 0.720364542, 1]))
            Line((-6.108437307, 0.203397992), (-6.108437352, 0.073267738))
            add(Edge.make_bspline(
                [(-6.108437352, 0.073267738), (-6.108437352, -1.177887338), (-4.52278049, -1.177887338)],
                knots=[3.079807634, 3.079807634, 3.079807634, 4.612744771, 4.612744771, 4.612744771], degree=2, weights=[1, 0.720364542, 1]))
            Line((-4.52278049, -1.177887338), (-4.429159437, -1.177887375))
            add(Edge.make_bspline(
                [(-4.429159437, -1.177887375), (-3.486357965, -1.177887375), (-3.068060402, -0.536753002)],
                knots=[1.760260959, 1.760260959, 1.760260959, 2.798844261, 2.798844261, 2.798844261], degree=2, weights=[1, 0.868170926, 1]))
            ThreePointArc((-3.068060402, -0.536753002), (-2.994310308, -0.417650167), (-2.935646337, -0.290437354))
            ThreePointArc((-2.935646337, -0.290437354), (-2.92405335, -0.24211404), (-2.925815458, -0.192450825))
            ThreePointArc((-2.925815458, -0.192450825), (-2.937820019, -0.171527836), (-2.960480033, -0.163257123))
            Line((-2.960480033, -0.163257123), (-3.891788755, -0.163257123))
            ThreePointArc((-3.891788755, -0.163257123), (-3.929556585, -0.175257922), (-3.953470124, -0.206858093))
            add(Edge.make_bspline(
                [(-4.449961703, -0.577741646), (-4.084853792, -0.578100851), (-3.953470124, -0.206858093)],
                knots=[5.955155363, 5.955155363, 5.955155363, 7.020735545, 7.020735545, 7.020735545], degree=2, weights=[1, 0.86139323, 1]))
            add(Edge.make_bspline(
                [(-4.509754859, 0.854894524), (-5.131844593, 0.82343689), (-5.101858724, 0.104979402), (-5.071872854, -0.613478086), (-4.449961703, -0.577741646)],
                knots=[3.181025595, 3.181025595, 3.181025595, 4.754799698, 4.754799698, 6.328573801, 6.328573801, 6.328573801], degree=2, weights=[1, 0.706053195, 1, 0.706053195, 1]))
            add(Edge.make_bspline(
                [(-3.95347013, 0.487388037), (-4.099708956, 0.900606071), (-4.509754859, 0.854894524)],
                knots=[2.40404244, 2.40404244, 2.40404244, 3.565685694, 3.565685694, 3.565685694], degree=2, weights=[1, 0.836012096, 1]))
            ThreePointArc((-3.95347013, 0.487388037), (-3.92955657, 0.455787841), (-3.89178871, 0.443787032))
        make_face()
    extrude(amount=CUT_EXTRUDE3_DEPTH, mode=Mode.SUBTRACT)

    # Sketch7 → Cut-Extrude4 (cut, through all)
    with BuildSketch(Plane(origin=(0, 1.5, 0), x_dir=(1, 0, 0), z_dir=(0, 1, 0))):
        with Locations((-2.868336067, 10.6)):
            Rectangle(SKETCH7_W, SKETCH7_H)
    extrude(amount=-CUT_EXTRUDE4_DEPTH, mode=Mode.SUBTRACT)

    # Sketch8 → Cut-Extrude5 (cut, through all)
    with BuildSketch(Plane(origin=(0, 1.5, 0), x_dir=(1, 0, 0), z_dir=(0, 1, 0))):
        with Locations((-4.294025381, 1.75)):
            Rectangle(SKETCH8_W, SKETCH8_H)
    extrude(amount=-CUT_EXTRUDE5_DEPTH, mode=Mode.SUBTRACT)


solid = part.part
